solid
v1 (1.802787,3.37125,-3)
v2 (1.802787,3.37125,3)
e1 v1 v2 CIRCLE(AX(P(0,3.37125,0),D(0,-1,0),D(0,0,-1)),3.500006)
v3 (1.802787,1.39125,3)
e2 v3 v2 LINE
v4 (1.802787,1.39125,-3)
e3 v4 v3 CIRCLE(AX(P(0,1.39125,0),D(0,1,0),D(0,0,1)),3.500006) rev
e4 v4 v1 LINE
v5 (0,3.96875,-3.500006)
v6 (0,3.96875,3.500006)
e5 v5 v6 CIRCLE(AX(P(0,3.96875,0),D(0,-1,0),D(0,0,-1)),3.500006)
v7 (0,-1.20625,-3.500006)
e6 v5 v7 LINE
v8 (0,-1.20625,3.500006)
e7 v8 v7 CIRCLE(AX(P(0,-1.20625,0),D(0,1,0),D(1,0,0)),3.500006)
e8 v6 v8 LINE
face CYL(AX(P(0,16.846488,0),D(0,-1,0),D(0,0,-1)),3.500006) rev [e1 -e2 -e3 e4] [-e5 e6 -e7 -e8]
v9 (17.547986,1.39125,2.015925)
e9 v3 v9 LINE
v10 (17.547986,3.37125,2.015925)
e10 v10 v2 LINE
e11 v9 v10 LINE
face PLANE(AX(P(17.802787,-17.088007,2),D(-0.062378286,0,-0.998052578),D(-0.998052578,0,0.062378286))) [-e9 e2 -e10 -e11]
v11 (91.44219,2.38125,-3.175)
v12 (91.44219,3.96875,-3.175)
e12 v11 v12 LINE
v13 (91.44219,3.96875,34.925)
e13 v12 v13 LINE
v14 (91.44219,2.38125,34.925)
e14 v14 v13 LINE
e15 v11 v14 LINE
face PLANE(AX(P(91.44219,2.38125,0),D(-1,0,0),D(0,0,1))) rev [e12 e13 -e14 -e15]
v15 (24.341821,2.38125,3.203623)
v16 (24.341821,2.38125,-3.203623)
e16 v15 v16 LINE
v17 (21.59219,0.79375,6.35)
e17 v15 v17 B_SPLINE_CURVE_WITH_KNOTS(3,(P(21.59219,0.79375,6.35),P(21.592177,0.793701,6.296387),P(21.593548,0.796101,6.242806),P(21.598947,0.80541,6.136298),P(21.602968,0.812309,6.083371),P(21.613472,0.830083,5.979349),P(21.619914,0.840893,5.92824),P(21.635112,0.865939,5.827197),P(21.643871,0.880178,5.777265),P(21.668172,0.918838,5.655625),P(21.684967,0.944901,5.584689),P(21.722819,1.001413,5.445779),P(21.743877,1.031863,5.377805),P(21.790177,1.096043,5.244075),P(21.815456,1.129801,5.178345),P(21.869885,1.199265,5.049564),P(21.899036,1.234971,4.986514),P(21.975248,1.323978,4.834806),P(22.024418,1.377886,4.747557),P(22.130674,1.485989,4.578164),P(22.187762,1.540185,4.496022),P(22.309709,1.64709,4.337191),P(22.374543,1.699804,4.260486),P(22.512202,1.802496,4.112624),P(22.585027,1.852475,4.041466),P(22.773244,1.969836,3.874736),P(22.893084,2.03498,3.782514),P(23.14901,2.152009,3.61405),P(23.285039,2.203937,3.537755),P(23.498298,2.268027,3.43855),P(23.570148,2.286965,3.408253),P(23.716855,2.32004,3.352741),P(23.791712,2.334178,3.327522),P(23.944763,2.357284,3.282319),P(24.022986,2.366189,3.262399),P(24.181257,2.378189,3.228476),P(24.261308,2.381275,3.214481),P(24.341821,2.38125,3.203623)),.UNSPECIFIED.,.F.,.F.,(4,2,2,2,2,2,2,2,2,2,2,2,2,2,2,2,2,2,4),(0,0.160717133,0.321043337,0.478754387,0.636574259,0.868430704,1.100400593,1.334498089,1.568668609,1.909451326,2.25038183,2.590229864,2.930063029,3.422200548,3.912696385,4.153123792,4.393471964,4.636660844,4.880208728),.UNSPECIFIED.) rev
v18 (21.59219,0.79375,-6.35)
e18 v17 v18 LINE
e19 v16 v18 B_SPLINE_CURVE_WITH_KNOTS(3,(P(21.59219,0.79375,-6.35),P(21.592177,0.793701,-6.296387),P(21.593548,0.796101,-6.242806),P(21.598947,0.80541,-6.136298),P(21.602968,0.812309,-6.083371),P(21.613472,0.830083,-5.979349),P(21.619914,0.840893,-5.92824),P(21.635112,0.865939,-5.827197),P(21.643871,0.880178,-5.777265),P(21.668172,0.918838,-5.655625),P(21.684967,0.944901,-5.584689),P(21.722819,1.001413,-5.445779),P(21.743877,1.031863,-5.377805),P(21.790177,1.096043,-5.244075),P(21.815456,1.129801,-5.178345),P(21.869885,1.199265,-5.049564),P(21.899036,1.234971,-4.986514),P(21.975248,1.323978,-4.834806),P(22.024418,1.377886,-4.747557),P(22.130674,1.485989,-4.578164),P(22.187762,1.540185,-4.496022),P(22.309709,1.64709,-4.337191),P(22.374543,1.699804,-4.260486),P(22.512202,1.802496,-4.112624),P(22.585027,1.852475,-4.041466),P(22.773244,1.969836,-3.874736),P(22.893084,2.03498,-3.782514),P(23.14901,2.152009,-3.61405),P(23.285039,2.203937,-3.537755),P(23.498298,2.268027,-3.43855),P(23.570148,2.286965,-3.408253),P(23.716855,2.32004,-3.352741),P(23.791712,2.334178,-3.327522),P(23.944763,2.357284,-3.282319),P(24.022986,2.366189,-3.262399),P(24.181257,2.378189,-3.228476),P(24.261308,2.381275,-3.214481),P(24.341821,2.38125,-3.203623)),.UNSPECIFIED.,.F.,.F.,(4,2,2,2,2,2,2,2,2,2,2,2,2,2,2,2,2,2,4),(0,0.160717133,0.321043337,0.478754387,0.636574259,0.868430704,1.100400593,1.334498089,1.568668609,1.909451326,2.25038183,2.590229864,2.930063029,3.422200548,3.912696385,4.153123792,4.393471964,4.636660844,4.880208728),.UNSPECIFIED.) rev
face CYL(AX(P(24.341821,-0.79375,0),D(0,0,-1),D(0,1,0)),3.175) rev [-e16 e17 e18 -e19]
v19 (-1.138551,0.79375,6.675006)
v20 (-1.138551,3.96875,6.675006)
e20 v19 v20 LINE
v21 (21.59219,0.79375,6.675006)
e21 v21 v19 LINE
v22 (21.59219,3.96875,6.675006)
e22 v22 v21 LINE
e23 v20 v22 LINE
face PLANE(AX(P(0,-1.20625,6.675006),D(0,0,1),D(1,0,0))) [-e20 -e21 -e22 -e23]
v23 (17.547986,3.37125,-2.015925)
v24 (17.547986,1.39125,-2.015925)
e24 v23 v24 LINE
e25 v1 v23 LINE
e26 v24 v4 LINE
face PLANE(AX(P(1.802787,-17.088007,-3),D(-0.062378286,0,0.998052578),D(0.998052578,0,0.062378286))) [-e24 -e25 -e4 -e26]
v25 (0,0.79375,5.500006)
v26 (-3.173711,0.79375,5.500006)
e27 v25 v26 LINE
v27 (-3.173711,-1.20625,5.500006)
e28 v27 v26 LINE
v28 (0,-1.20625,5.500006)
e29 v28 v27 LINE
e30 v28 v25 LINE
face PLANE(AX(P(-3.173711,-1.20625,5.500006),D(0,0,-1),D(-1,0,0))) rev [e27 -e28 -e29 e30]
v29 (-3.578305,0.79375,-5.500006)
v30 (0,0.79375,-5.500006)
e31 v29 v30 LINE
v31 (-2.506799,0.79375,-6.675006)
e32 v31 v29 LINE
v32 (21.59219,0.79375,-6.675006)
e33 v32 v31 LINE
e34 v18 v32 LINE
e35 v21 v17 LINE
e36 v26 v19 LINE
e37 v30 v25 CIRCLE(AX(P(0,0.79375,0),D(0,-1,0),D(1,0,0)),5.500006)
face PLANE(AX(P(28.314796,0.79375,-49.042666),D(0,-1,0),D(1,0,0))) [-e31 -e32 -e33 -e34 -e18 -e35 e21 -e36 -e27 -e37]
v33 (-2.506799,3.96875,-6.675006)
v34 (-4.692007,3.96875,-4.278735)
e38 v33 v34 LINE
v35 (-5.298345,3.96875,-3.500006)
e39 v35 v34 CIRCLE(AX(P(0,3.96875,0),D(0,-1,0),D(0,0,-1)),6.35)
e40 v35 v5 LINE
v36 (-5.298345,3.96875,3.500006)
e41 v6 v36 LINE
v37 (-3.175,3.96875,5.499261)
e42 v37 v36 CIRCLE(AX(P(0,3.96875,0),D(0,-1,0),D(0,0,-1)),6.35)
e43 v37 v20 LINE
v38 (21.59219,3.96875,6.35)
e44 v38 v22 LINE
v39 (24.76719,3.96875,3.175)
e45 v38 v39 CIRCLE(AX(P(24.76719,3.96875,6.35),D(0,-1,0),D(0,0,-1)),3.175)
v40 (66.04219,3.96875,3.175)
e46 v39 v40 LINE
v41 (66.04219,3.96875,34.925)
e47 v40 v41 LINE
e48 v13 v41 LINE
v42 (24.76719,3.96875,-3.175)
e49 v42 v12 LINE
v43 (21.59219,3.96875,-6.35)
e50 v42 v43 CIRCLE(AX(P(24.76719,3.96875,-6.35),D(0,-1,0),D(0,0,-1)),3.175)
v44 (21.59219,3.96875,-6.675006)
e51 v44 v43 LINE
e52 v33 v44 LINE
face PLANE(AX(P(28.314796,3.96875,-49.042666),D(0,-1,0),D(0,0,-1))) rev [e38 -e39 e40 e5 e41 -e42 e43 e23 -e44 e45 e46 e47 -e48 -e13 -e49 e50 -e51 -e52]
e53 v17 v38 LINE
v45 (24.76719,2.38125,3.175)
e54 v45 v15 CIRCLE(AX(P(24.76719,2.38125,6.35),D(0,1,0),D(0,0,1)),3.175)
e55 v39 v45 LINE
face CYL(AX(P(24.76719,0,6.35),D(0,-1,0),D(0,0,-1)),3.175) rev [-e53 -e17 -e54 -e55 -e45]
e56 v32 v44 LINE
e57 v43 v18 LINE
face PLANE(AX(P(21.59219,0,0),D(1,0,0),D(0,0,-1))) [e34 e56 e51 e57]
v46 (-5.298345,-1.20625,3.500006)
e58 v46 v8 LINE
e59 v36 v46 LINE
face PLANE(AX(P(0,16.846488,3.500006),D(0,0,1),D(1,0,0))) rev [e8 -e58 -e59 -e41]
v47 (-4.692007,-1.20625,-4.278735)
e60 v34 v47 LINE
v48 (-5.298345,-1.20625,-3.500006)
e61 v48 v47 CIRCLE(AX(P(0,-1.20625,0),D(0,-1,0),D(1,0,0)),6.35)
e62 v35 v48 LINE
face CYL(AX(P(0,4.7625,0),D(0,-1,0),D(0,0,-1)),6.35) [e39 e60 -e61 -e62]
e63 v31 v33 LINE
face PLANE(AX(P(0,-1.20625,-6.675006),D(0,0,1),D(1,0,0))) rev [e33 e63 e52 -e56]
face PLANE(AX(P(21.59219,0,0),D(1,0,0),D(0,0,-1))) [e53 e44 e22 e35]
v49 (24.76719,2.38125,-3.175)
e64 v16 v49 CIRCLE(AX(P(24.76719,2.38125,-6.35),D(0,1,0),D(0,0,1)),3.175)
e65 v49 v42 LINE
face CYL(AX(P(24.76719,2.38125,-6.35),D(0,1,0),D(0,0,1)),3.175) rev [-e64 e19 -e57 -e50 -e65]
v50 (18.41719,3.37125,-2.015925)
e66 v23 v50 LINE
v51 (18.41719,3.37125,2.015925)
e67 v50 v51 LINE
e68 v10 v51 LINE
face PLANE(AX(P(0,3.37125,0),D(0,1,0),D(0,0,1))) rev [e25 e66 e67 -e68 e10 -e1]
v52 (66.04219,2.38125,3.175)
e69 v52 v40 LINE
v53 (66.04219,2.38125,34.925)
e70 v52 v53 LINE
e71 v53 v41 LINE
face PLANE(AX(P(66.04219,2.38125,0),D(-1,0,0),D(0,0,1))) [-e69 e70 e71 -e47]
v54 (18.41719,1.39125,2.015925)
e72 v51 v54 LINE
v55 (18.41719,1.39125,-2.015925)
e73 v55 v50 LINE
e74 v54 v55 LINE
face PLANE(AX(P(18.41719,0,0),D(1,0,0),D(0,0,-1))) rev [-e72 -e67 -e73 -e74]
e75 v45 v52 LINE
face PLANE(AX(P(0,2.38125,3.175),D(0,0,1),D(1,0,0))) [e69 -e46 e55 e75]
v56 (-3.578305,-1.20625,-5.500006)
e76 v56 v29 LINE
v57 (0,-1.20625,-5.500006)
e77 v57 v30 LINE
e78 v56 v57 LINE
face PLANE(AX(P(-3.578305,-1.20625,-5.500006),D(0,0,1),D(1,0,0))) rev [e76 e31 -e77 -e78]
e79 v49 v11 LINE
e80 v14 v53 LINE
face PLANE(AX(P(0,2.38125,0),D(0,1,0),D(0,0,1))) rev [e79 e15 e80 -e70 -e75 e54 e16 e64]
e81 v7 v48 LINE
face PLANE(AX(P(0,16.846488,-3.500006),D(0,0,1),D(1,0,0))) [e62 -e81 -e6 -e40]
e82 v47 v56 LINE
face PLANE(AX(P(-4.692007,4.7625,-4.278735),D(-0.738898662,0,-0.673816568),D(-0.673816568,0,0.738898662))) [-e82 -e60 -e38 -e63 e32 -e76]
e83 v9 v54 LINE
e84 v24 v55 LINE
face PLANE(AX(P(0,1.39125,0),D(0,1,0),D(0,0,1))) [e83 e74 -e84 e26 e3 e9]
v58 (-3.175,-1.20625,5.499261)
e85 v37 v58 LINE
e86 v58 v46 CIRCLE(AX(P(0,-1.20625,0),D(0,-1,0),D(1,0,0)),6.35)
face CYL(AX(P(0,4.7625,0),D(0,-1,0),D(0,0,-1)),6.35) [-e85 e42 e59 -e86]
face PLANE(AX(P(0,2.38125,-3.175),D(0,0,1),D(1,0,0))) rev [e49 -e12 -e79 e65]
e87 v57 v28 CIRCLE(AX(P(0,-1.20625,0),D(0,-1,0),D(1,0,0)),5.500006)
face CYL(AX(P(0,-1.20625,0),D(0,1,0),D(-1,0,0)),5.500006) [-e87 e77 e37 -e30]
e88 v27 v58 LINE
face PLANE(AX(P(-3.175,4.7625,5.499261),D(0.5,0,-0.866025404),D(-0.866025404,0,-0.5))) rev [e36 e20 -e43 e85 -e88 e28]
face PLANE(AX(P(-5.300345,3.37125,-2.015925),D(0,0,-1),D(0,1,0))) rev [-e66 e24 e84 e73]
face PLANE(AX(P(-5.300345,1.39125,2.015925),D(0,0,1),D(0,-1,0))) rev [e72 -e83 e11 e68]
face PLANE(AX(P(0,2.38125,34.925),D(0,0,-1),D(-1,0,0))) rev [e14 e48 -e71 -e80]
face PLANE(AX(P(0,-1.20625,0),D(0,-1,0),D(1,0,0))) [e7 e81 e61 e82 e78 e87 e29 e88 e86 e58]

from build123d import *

# Parameters (mm, degrees)
BOSS_EXTRUDE1_DEPTH = 4.7625
SKETCH5_R           = 3.5000057
CUT_EXTRUDE2_DEPTH  = 3.37125
CUT_EXTRUDE3_START  = 1.98
CUT_EXTRUDE3_DEPTH  = 1.98
SKETCH10_W          = 6.35
SKETCH10_H          = 0.79375
SKETCH10_W_2        = 35.745198541
SKETCH10_W_3        = 19.548012242
CUT_EXTRUDE4_DEPTH  = 68.70484365
CUT_EXTRUDE5_DEPTH  = 2.54
BOSS_EXTRUDE2_START = 2
BOSS_EXTRUDE2_DEPTH = 2
CUT_EXTRUDE6_DEPTH  = 62.875089873
BOSS_EXTRUDE4_REACH = 26.955
SKETCH15_W          = 13.3500114
SKETCH15_H          = 3.175
SKETCH15_W_2        = 4.031850112
SKETCH15_H_2        = 1.98
SKETCH20_W          = 13.3500114
SKETCH20_H          = 3.175
BOSS_EXTRUDE7_DEPTH = 3.175
SKETCH21_W          = 25.4
SKETCH21_H          = 31.75
BOSS_EXTRUDE8_DEPTH = 1.5875
FILLET1_R           = 3.175


with BuildPart() as part:
    # Sketch1 → Boss-Extrude1 (new body)
    with BuildSketch(Plane(origin=(0, 0, 0), x_dir=(1, 0, 0), z_dir=(0, 1, 0))):
        with BuildLine():
            Line((23.295952901, 15.613744639), (32.606191406, 26.334377035))
            ThreePointArc((32.606191406, 26.334377035), (32.033289602, 35.241600739), (23.119772343, 34.776777479))
            Line((23.119772343, 34.776777479), (-4.692006503, 4.278735207))
            ThreePointArc((-4.692006503, 4.278735207), (-6.274930424, -0.973523588), (-3.175, -5.499261314))
            Line((-3.175, -5.499261314), (27.78125, -23.371860585))
            ThreePointArc((27.78125, -23.371860585), (37.752424387, -26.756618196), (48.25987898, -26.067923237))
            ThreePointArc((48.25987898, -26.067923237), (49.382410995, -24.123640754), (47.438128512, -23.001108739))
            ThreePointArc((47.438128512, -23.001108739), (21.083895316, -12.623567162), (23.295952901, 15.613744639))
        make_face()
    extrude(amount=BOSS_EXTRUDE1_DEPTH)

    # Sketch5 → Cut-Extrude2 (cut)
    with BuildSketch(Plane.XZ):
        Circle(SKETCH5_R)
        with BuildLine():
            ThreePointArc((0, -3.5000057), (-3.5000057, 0), (0, 3.5000057))
            Line((0, 3.5000057), (-5.298345034, 3.5000057))
            ThreePointArc((-5.298345034, 3.5000057), (-6.35, 0), (-5.298345034, -3.5000057))
            Line((-5.298345034, -3.5000057), (0, -3.5000057))
        make_face()
    extrude(amount=-CUT_EXTRUDE2_DEPTH, mode=Mode.SUBTRACT)

    # Sketch6 → Cut-Extrude3 (cut)
    with BuildSketch(Plane.XZ.offset(-3.37125).offset(CUT_EXTRUDE3_START)):
        with BuildLine():
            Line((17.802786704, -2), (17.802786704, 2))
            Line((17.802786704, 2), (1.802786704, 3))
            ThreePointArc((1.802786704, 3), (3.5000057, 0), (1.802786704, -3))
            Line((1.802786704, -3), (17.802786704, -2))
        make_face()
    extrude(amount=-CUT_EXTRUDE3_DEPTH, mode=Mode.SUBTRACT)

    # Sketch10 → Cut-Extrude4 (cut, through all)
    with BuildSketch(Plane(origin=(-3.175, 0, 5.499261314), x_dir=(0.8660254037844385, 0, 0.5000000000000003), z_dir=(-0.5000000000000003, 0, 0.8660254037844385))):
        with Locations((-3.175, 4.365625)):
            Rectangle(SKETCH10_W, SKETCH10_H)
        with Locations((17.872599271, 4.365625)):
            Rectangle(SKETCH10_W_2, SKETCH10_H)
        with Locations((45.519204662, 4.365625)):
            Rectangle(SKETCH10_W_3, SKETCH10_H)
        with Locations((45.519204662, 0.396875)):
            Rectangle(SKETCH10_W_3, SKETCH10_H)
        with Locations((17.872599271, 0.396875)):
            Rectangle(SKETCH10_W_2, SKETCH10_H)
        with Locations((-3.175, 0.396875)):
            Rectangle(SKETCH10_W, SKETCH10_H)
    extrude(amount=-CUT_EXTRUDE4_DEPTH, mode=Mode.SUBTRACT)

    # Sketch11 → Cut-Extrude5 (cut)
    with BuildSketch(Plane.XZ.offset(-3.37125)):
        with BuildLine():
            Line((-5.298345034, 3.5000057), (0, 3.5000057))
            ThreePointArc((0, 3.5000057), (3.5000057, 0), (0, -3.5000057))
            Line((0, -3.5000057), (-5.298345034, -3.5000057))
            ThreePointArc((-5.298345034, -3.5000057), (-6.35, 0), (-5.298345034, 3.5000057))
        make_face()
    extrude(amount=-CUT_EXTRUDE5_DEPTH, mode=Mode.SUBTRACT)

    # Sketch12 → Boss-Extrude2 (add)
    with BuildSketch(Plane.XZ.offset(-0.79375).offset(BOSS_EXTRUDE2_START)):
        with BuildLine():
            Line((-3.175, 5.499261314), (-3.173710686, 5.5000057))
            Line((-3.173710686, 5.5000057), (0, 5.5000057))
            ThreePointArc((0, 5.5000057), (5.5000057, 0), (0, -5.5000057))
            Line((0, -5.5000057), (-3.57830535, -5.5000057))
            Line((-3.57830535, -5.5000057), (-4.692006503, -4.278735207))
            ThreePointArc((-4.692006503, -4.278735207), (-5.010327921, -3.901168303), (-5.298345034, -3.5000057))
            Line((-5.298345034, -3.5000057), (0, -3.5000057))
            ThreePointArc((0, -3.5000057), (3.5000057, 0), (0, 3.5000057))
            Line((0, 3.5000057), (-5.298345034, 3.5000057))
            ThreePointArc((-5.298345034, 3.5000057), (-4.353004683, 4.623186156), (-3.175, 5.499261314))
        make_face()
    extrude(amount=-BOSS_EXTRUDE2_DEPTH)

    # Sketch14 → Cut-Extrude6 (cut, through all)
    with BuildSketch(Plane(origin=(0, 3.96875, 0), x_dir=(1, 0, 0), z_dir=(0, 1, 0))):
        with BuildLine():
            Line((-2.50679919, 6.6750057), (18.4171905, 6.6750057))
            ThreePointArc((18.4171905, 6.6750057), (20.373146549, 11.408228546), (23.295952901, 15.613744639))
            Line((23.295952901, 15.613744639), (32.606191406, 26.334377035))
            ThreePointArc((32.606191406, 26.334377035), (32.033289602, 35.241600739), (23.119772343, 34.776777479))
            Line((23.119772343, 34.776777479), (-2.50679919, 6.6750057))
        make_face()
        with BuildLine():
            ThreePointArc((47.438128512, -23.001108739), (29.599662599, -20.753834653), (18.4171905, -6.6750057))
            Line((18.4171905, -6.6750057), (-1.138550987, -6.6750057))
            Line((-1.138550987, -6.6750057), (27.78125, -23.371860585))
            ThreePointArc((27.78125, -23.371860585), (37.752424387, -26.756618196), (48.25987898, -26.067923237))
            ThreePointArc((48.25987898, -26.067923237), (49.382410995, -24.123640754), (47.438128512, -23.001108739))
        make_face()
    extrude(amount=-CUT_EXTRUDE6_DEPTH, mode=Mode.SUBTRACT)

    # Sketch15 → Boss-Extrude4 (add, up to next)
    with BuildSketch(Plane(origin=(18.4171905, 0, 0), x_dir=(0, 0, -1), z_dir=(1, 0, 0)), mode=Mode.PRIVATE) as boss_extrude4_sk1:
        with Locations((0, 2.38125)):
            Rectangle(SKETCH15_W, SKETCH15_H)
        with Locations((0, 2.38125)):
            Rectangle(SKETCH15_W_2, SKETCH15_H_2, mode=Mode.SUBTRACT)
    boss_extrude4_tool1 = extrude(boss_extrude4_sk1.sketch, amount=-BOSS_EXTRUDE4_REACH, mode=Mode.PRIVATE) - part.part
    add(boss_extrude4_tool1.solids().sort_by_distance((18.41719, 2.38125, -6.537782))[0])

    # Sketch20 → Boss-Extrude7 (add)
    with BuildSketch(Plane(origin=(18.4171905, 0, 0), x_dir=(0, 0, -1), z_dir=(1, 0, 0))):
        with Locations((0, 2.38125)):
            Rectangle(SKETCH20_W, SKETCH20_H)
    extrude(amount=BOSS_EXTRUDE7_DEPTH)

    # Sketch21 → Boss-Extrude8 (add)
    with BuildSketch(Plane(origin=(0, 3.96875, 0), x_dir=(1, 0, 0), z_dir=(0, 1, 0))):
        with Locations((78.7421905, -19.05)):
            Rectangle(SKETCH21_W, SKETCH21_H)
        Polygon((91.4421905, 3.175), (21.5921905, 3.175), (21.5921905, -3.175), (66.0421905, -3.175), (91.4421905, -3.175), align=None)
    extrude(amount=-BOSS_EXTRUDE8_DEPTH)

    # Fillet1
    # the kernel refuses this fillet: 3.175 mm, written as the material it adds along each edge
    with BuildSketch(Plane(origin=(21.5921905, 3.96875, 3.175), x_dir=(0, 0, 1), z_dir=(0, -1, 0))) as fillet1_piece_1:
        with BuildLine():
            CenterArc((FILLET1_R, -FILLET1_R), FILLET1_R, 90, 90)
            Line((0, -FILLET1_R), (-FILLET1_R * 0.02, -FILLET1_R))
            Line((-FILLET1_R * 0.02, -FILLET1_R), (-FILLET1_R * 0.02, FILLET1_R * 0.02))
            Line((-FILLET1_R * 0.02, FILLET1_R * 0.02), (FILLET1_R, FILLET1_R * 0.02))
            Line((FILLET1_R, FILLET1_R * 0.02), (FILLET1_R, 0))
        make_face()
    extrude(amount=1.5875)
    with BuildSketch(Plane(origin=(21.5921905, 3.96875, -3.175), x_dir=(0, 0, -1), z_dir=(0, -1, 0))) as fillet1_piece_2:
        with BuildLine():
            CenterArc((FILLET1_R, FILLET1_R), FILLET1_R, 180, 90)
            Line((0, FILLET1_R), (-FILLET1_R * 0.02, FILLET1_R))
            Line((-FILLET1_R * 0.02, FILLET1_R), (-FILLET1_R * 0.02, -FILLET1_R * 0.02))
            Line((-FILLET1_R * 0.02, -FILLET1_R * 0.02), (FILLET1_R, -FILLET1_R * 0.02))
            Line((FILLET1_R, -FILLET1_R * 0.02), (FILLET1_R, 0))
        make_face()
    extrude(amount=1.5875)
    with BuildSketch(Plane(origin=(21.5921905, 2.38125, -3.175), x_dir=(0, -1, 0), z_dir=(0, 0, 1))) as fillet1_piece_3:
        with BuildLine():
            CenterArc((3.175, 2.749630657), FILLET1_R, 180, 60)
            Line((0, 2.749630657), (-0.0635, 2.749630657))
            Line((-0.0635, 2.749630657), (-0.0635, 0))
            Line((-0.0635, 0), (0, -0.0635))
            ThreePointArc((0, -0.0635), (0.79375, -0.0635), (1.55575, -0.054992613))
            Line((1.55575, -0.054992613), (1.5875, 0))
        make_face()
    extrude(amount=6.35)
    with BuildSketch(Plane(origin=(21.5921905, 3.96875, 3.175), x_dir=(0, 0, 1), z_dir=(0, -1, 0))) as fillet1_piece_4a_section:
        with BuildLine():
            CenterArc((FILLET1_R, -FILLET1_R), FILLET1_R, 90, 90)
            Line((0, -FILLET1_R), (-FILLET1_R * 0.02, -FILLET1_R))
            Line((-FILLET1_R * 0.02, -FILLET1_R), (-FILLET1_R * 0.02, FILLET1_R * 0.02))
            Line((-FILLET1_R * 0.02, FILLET1_R * 0.02), (FILLET1_R, FILLET1_R * 0.02))
            Line((FILLET1_R, FILLET1_R * 0.02), (FILLET1_R, 0))
        make_face()
    fillet1_piece_4a = extrude(amount=9.525, mode=Mode.PRIVATE)
    fillet1_piece_4a = split(fillet1_piece_4a, bisect_by=Plane(origin=(22.310994987, 0.79375, 3.893804488), z_dir=(0, 1, 0)), keep=Keep.TOP, mode=Mode.PRIVATE)
    fillet1_piece_4a = split(fillet1_piece_4a, bisect_by=Plane(origin=(22.310994987, 2.38125, 3.893804488), z_dir=(0, -1, 0)), keep=Keep.TOP, mode=Mode.PRIVATE)
    with BuildSketch(Plane(origin=(21.5921905, 2.38125, -3.175), x_dir=(0, -1, 0), z_dir=(0, 0, 1))) as fillet1_piece_4b_section:
        with BuildLine():
            CenterArc((3.175, 2.749630657), FILLET1_R, 180, 60)
            Line((0, 2.749630657), (-0.0635, 2.749630657))
            Line((-0.0635, 2.749630657), (-0.0635, 0))
            Line((-0.0635, 0), (0, -0.0635))
            ThreePointArc((0, -0.0635), (0.79375, -0.0635), (1.55575, -0.054992613))
            Line((1.55575, -0.054992613), (1.5875, 0))
        make_face()
    fillet1_piece_4b = extrude(amount=13.224076643, mode=Mode.PRIVATE)
    fillet1_piece_4b = split(fillet1_piece_4b, bisect_by=Plane(origin=(22.278976165, 1.970034442, 6.6750057), z_dir=(0, 0, -1)), keep=Keep.TOP, mode=Mode.PRIVATE)
    fillet1_piece_4b = split(fillet1_piece_4b, bisect_by=Plane(origin=(22.278976165, 1.970034442, 3.175), z_dir=(0, 0, 1)), keep=Keep.TOP, mode=Mode.PRIVATE)
    fillet1_piece_4 = fillet1_piece_4a & fillet1_piece_4b
    add(fillet1_piece_4)
    with BuildSketch(Plane(origin=(21.5921905, 2.38125, -10.049076643), x_dir=(0, -1, 0), z_dir=(0, 0, 1))) as fillet1_piece_5a_section:
        with BuildLine():
            CenterArc((3.175, 2.749630657), FILLET1_R, 180, 60)
            Line((0, 2.749630657), (-0.0635, 2.749630657))
            Line((-0.0635, 2.749630657), (-0.0635, 0))
            Line((-0.0635, 0), (0, -0.0635))
            ThreePointArc((0, -0.0635), (0.79375, -0.0635), (1.55575, -0.054992613))
            Line((1.55575, -0.054992613), (1.5875, 0))
        make_face()
    fillet1_piece_5a = extrude(amount=13.224076643, mode=Mode.PRIVATE)
    fillet1_piece_5a = split(fillet1_piece_5a, bisect_by=Plane(origin=(22.278976165, 1.970034442, -6.6750057), z_dir=(0, 0, 1)), keep=Keep.TOP, mode=Mode.PRIVATE)
    fillet1_piece_5a = split(fillet1_piece_5a, bisect_by=Plane(origin=(22.278976165, 1.970034442, -3.175), z_dir=(0, 0, -1)), keep=Keep.TOP, mode=Mode.PRIVATE)
    with BuildSketch(Plane(origin=(21.5921905, 3.96875, -3.175), x_dir=(0, 0, -1), z_dir=(0, -1, 0))) as fillet1_piece_5b_section:
        with BuildLine():
            CenterArc((FILLET1_R, FILLET1_R), FILLET1_R, 180, 90)
            Line((0, FILLET1_R), (-FILLET1_R * 0.02, FILLET1_R))
            Line((-FILLET1_R * 0.02, FILLET1_R), (-FILLET1_R * 0.02, -FILLET1_R * 0.02))
            Line((-FILLET1_R * 0.02, -FILLET1_R * 0.02), (FILLET1_R, -FILLET1_R * 0.02))
            Line((FILLET1_R, -FILLET1_R * 0.02), (FILLET1_R, 0))
        make_face()
    fillet1_piece_5b = extrude(amount=9.525, mode=Mode.PRIVATE)
    fillet1_piece_5b = split(fillet1_piece_5b, bisect_by=Plane(origin=(22.310994987, 0.79375, -3.893804488), z_dir=(0, 1, 0)), keep=Keep.TOP, mode=Mode.PRIVATE)
    fillet1_piece_5b = split(fillet1_piece_5b, bisect_by=Plane(origin=(22.310994987, 2.38125, -3.893804488), z_dir=(0, -1, 0)), keep=Keep.TOP, mode=Mode.PRIVATE)
    fillet1_piece_5 = fillet1_piece_5a & fillet1_piece_5b
    add(fillet1_piece_5)


solid = part.part
